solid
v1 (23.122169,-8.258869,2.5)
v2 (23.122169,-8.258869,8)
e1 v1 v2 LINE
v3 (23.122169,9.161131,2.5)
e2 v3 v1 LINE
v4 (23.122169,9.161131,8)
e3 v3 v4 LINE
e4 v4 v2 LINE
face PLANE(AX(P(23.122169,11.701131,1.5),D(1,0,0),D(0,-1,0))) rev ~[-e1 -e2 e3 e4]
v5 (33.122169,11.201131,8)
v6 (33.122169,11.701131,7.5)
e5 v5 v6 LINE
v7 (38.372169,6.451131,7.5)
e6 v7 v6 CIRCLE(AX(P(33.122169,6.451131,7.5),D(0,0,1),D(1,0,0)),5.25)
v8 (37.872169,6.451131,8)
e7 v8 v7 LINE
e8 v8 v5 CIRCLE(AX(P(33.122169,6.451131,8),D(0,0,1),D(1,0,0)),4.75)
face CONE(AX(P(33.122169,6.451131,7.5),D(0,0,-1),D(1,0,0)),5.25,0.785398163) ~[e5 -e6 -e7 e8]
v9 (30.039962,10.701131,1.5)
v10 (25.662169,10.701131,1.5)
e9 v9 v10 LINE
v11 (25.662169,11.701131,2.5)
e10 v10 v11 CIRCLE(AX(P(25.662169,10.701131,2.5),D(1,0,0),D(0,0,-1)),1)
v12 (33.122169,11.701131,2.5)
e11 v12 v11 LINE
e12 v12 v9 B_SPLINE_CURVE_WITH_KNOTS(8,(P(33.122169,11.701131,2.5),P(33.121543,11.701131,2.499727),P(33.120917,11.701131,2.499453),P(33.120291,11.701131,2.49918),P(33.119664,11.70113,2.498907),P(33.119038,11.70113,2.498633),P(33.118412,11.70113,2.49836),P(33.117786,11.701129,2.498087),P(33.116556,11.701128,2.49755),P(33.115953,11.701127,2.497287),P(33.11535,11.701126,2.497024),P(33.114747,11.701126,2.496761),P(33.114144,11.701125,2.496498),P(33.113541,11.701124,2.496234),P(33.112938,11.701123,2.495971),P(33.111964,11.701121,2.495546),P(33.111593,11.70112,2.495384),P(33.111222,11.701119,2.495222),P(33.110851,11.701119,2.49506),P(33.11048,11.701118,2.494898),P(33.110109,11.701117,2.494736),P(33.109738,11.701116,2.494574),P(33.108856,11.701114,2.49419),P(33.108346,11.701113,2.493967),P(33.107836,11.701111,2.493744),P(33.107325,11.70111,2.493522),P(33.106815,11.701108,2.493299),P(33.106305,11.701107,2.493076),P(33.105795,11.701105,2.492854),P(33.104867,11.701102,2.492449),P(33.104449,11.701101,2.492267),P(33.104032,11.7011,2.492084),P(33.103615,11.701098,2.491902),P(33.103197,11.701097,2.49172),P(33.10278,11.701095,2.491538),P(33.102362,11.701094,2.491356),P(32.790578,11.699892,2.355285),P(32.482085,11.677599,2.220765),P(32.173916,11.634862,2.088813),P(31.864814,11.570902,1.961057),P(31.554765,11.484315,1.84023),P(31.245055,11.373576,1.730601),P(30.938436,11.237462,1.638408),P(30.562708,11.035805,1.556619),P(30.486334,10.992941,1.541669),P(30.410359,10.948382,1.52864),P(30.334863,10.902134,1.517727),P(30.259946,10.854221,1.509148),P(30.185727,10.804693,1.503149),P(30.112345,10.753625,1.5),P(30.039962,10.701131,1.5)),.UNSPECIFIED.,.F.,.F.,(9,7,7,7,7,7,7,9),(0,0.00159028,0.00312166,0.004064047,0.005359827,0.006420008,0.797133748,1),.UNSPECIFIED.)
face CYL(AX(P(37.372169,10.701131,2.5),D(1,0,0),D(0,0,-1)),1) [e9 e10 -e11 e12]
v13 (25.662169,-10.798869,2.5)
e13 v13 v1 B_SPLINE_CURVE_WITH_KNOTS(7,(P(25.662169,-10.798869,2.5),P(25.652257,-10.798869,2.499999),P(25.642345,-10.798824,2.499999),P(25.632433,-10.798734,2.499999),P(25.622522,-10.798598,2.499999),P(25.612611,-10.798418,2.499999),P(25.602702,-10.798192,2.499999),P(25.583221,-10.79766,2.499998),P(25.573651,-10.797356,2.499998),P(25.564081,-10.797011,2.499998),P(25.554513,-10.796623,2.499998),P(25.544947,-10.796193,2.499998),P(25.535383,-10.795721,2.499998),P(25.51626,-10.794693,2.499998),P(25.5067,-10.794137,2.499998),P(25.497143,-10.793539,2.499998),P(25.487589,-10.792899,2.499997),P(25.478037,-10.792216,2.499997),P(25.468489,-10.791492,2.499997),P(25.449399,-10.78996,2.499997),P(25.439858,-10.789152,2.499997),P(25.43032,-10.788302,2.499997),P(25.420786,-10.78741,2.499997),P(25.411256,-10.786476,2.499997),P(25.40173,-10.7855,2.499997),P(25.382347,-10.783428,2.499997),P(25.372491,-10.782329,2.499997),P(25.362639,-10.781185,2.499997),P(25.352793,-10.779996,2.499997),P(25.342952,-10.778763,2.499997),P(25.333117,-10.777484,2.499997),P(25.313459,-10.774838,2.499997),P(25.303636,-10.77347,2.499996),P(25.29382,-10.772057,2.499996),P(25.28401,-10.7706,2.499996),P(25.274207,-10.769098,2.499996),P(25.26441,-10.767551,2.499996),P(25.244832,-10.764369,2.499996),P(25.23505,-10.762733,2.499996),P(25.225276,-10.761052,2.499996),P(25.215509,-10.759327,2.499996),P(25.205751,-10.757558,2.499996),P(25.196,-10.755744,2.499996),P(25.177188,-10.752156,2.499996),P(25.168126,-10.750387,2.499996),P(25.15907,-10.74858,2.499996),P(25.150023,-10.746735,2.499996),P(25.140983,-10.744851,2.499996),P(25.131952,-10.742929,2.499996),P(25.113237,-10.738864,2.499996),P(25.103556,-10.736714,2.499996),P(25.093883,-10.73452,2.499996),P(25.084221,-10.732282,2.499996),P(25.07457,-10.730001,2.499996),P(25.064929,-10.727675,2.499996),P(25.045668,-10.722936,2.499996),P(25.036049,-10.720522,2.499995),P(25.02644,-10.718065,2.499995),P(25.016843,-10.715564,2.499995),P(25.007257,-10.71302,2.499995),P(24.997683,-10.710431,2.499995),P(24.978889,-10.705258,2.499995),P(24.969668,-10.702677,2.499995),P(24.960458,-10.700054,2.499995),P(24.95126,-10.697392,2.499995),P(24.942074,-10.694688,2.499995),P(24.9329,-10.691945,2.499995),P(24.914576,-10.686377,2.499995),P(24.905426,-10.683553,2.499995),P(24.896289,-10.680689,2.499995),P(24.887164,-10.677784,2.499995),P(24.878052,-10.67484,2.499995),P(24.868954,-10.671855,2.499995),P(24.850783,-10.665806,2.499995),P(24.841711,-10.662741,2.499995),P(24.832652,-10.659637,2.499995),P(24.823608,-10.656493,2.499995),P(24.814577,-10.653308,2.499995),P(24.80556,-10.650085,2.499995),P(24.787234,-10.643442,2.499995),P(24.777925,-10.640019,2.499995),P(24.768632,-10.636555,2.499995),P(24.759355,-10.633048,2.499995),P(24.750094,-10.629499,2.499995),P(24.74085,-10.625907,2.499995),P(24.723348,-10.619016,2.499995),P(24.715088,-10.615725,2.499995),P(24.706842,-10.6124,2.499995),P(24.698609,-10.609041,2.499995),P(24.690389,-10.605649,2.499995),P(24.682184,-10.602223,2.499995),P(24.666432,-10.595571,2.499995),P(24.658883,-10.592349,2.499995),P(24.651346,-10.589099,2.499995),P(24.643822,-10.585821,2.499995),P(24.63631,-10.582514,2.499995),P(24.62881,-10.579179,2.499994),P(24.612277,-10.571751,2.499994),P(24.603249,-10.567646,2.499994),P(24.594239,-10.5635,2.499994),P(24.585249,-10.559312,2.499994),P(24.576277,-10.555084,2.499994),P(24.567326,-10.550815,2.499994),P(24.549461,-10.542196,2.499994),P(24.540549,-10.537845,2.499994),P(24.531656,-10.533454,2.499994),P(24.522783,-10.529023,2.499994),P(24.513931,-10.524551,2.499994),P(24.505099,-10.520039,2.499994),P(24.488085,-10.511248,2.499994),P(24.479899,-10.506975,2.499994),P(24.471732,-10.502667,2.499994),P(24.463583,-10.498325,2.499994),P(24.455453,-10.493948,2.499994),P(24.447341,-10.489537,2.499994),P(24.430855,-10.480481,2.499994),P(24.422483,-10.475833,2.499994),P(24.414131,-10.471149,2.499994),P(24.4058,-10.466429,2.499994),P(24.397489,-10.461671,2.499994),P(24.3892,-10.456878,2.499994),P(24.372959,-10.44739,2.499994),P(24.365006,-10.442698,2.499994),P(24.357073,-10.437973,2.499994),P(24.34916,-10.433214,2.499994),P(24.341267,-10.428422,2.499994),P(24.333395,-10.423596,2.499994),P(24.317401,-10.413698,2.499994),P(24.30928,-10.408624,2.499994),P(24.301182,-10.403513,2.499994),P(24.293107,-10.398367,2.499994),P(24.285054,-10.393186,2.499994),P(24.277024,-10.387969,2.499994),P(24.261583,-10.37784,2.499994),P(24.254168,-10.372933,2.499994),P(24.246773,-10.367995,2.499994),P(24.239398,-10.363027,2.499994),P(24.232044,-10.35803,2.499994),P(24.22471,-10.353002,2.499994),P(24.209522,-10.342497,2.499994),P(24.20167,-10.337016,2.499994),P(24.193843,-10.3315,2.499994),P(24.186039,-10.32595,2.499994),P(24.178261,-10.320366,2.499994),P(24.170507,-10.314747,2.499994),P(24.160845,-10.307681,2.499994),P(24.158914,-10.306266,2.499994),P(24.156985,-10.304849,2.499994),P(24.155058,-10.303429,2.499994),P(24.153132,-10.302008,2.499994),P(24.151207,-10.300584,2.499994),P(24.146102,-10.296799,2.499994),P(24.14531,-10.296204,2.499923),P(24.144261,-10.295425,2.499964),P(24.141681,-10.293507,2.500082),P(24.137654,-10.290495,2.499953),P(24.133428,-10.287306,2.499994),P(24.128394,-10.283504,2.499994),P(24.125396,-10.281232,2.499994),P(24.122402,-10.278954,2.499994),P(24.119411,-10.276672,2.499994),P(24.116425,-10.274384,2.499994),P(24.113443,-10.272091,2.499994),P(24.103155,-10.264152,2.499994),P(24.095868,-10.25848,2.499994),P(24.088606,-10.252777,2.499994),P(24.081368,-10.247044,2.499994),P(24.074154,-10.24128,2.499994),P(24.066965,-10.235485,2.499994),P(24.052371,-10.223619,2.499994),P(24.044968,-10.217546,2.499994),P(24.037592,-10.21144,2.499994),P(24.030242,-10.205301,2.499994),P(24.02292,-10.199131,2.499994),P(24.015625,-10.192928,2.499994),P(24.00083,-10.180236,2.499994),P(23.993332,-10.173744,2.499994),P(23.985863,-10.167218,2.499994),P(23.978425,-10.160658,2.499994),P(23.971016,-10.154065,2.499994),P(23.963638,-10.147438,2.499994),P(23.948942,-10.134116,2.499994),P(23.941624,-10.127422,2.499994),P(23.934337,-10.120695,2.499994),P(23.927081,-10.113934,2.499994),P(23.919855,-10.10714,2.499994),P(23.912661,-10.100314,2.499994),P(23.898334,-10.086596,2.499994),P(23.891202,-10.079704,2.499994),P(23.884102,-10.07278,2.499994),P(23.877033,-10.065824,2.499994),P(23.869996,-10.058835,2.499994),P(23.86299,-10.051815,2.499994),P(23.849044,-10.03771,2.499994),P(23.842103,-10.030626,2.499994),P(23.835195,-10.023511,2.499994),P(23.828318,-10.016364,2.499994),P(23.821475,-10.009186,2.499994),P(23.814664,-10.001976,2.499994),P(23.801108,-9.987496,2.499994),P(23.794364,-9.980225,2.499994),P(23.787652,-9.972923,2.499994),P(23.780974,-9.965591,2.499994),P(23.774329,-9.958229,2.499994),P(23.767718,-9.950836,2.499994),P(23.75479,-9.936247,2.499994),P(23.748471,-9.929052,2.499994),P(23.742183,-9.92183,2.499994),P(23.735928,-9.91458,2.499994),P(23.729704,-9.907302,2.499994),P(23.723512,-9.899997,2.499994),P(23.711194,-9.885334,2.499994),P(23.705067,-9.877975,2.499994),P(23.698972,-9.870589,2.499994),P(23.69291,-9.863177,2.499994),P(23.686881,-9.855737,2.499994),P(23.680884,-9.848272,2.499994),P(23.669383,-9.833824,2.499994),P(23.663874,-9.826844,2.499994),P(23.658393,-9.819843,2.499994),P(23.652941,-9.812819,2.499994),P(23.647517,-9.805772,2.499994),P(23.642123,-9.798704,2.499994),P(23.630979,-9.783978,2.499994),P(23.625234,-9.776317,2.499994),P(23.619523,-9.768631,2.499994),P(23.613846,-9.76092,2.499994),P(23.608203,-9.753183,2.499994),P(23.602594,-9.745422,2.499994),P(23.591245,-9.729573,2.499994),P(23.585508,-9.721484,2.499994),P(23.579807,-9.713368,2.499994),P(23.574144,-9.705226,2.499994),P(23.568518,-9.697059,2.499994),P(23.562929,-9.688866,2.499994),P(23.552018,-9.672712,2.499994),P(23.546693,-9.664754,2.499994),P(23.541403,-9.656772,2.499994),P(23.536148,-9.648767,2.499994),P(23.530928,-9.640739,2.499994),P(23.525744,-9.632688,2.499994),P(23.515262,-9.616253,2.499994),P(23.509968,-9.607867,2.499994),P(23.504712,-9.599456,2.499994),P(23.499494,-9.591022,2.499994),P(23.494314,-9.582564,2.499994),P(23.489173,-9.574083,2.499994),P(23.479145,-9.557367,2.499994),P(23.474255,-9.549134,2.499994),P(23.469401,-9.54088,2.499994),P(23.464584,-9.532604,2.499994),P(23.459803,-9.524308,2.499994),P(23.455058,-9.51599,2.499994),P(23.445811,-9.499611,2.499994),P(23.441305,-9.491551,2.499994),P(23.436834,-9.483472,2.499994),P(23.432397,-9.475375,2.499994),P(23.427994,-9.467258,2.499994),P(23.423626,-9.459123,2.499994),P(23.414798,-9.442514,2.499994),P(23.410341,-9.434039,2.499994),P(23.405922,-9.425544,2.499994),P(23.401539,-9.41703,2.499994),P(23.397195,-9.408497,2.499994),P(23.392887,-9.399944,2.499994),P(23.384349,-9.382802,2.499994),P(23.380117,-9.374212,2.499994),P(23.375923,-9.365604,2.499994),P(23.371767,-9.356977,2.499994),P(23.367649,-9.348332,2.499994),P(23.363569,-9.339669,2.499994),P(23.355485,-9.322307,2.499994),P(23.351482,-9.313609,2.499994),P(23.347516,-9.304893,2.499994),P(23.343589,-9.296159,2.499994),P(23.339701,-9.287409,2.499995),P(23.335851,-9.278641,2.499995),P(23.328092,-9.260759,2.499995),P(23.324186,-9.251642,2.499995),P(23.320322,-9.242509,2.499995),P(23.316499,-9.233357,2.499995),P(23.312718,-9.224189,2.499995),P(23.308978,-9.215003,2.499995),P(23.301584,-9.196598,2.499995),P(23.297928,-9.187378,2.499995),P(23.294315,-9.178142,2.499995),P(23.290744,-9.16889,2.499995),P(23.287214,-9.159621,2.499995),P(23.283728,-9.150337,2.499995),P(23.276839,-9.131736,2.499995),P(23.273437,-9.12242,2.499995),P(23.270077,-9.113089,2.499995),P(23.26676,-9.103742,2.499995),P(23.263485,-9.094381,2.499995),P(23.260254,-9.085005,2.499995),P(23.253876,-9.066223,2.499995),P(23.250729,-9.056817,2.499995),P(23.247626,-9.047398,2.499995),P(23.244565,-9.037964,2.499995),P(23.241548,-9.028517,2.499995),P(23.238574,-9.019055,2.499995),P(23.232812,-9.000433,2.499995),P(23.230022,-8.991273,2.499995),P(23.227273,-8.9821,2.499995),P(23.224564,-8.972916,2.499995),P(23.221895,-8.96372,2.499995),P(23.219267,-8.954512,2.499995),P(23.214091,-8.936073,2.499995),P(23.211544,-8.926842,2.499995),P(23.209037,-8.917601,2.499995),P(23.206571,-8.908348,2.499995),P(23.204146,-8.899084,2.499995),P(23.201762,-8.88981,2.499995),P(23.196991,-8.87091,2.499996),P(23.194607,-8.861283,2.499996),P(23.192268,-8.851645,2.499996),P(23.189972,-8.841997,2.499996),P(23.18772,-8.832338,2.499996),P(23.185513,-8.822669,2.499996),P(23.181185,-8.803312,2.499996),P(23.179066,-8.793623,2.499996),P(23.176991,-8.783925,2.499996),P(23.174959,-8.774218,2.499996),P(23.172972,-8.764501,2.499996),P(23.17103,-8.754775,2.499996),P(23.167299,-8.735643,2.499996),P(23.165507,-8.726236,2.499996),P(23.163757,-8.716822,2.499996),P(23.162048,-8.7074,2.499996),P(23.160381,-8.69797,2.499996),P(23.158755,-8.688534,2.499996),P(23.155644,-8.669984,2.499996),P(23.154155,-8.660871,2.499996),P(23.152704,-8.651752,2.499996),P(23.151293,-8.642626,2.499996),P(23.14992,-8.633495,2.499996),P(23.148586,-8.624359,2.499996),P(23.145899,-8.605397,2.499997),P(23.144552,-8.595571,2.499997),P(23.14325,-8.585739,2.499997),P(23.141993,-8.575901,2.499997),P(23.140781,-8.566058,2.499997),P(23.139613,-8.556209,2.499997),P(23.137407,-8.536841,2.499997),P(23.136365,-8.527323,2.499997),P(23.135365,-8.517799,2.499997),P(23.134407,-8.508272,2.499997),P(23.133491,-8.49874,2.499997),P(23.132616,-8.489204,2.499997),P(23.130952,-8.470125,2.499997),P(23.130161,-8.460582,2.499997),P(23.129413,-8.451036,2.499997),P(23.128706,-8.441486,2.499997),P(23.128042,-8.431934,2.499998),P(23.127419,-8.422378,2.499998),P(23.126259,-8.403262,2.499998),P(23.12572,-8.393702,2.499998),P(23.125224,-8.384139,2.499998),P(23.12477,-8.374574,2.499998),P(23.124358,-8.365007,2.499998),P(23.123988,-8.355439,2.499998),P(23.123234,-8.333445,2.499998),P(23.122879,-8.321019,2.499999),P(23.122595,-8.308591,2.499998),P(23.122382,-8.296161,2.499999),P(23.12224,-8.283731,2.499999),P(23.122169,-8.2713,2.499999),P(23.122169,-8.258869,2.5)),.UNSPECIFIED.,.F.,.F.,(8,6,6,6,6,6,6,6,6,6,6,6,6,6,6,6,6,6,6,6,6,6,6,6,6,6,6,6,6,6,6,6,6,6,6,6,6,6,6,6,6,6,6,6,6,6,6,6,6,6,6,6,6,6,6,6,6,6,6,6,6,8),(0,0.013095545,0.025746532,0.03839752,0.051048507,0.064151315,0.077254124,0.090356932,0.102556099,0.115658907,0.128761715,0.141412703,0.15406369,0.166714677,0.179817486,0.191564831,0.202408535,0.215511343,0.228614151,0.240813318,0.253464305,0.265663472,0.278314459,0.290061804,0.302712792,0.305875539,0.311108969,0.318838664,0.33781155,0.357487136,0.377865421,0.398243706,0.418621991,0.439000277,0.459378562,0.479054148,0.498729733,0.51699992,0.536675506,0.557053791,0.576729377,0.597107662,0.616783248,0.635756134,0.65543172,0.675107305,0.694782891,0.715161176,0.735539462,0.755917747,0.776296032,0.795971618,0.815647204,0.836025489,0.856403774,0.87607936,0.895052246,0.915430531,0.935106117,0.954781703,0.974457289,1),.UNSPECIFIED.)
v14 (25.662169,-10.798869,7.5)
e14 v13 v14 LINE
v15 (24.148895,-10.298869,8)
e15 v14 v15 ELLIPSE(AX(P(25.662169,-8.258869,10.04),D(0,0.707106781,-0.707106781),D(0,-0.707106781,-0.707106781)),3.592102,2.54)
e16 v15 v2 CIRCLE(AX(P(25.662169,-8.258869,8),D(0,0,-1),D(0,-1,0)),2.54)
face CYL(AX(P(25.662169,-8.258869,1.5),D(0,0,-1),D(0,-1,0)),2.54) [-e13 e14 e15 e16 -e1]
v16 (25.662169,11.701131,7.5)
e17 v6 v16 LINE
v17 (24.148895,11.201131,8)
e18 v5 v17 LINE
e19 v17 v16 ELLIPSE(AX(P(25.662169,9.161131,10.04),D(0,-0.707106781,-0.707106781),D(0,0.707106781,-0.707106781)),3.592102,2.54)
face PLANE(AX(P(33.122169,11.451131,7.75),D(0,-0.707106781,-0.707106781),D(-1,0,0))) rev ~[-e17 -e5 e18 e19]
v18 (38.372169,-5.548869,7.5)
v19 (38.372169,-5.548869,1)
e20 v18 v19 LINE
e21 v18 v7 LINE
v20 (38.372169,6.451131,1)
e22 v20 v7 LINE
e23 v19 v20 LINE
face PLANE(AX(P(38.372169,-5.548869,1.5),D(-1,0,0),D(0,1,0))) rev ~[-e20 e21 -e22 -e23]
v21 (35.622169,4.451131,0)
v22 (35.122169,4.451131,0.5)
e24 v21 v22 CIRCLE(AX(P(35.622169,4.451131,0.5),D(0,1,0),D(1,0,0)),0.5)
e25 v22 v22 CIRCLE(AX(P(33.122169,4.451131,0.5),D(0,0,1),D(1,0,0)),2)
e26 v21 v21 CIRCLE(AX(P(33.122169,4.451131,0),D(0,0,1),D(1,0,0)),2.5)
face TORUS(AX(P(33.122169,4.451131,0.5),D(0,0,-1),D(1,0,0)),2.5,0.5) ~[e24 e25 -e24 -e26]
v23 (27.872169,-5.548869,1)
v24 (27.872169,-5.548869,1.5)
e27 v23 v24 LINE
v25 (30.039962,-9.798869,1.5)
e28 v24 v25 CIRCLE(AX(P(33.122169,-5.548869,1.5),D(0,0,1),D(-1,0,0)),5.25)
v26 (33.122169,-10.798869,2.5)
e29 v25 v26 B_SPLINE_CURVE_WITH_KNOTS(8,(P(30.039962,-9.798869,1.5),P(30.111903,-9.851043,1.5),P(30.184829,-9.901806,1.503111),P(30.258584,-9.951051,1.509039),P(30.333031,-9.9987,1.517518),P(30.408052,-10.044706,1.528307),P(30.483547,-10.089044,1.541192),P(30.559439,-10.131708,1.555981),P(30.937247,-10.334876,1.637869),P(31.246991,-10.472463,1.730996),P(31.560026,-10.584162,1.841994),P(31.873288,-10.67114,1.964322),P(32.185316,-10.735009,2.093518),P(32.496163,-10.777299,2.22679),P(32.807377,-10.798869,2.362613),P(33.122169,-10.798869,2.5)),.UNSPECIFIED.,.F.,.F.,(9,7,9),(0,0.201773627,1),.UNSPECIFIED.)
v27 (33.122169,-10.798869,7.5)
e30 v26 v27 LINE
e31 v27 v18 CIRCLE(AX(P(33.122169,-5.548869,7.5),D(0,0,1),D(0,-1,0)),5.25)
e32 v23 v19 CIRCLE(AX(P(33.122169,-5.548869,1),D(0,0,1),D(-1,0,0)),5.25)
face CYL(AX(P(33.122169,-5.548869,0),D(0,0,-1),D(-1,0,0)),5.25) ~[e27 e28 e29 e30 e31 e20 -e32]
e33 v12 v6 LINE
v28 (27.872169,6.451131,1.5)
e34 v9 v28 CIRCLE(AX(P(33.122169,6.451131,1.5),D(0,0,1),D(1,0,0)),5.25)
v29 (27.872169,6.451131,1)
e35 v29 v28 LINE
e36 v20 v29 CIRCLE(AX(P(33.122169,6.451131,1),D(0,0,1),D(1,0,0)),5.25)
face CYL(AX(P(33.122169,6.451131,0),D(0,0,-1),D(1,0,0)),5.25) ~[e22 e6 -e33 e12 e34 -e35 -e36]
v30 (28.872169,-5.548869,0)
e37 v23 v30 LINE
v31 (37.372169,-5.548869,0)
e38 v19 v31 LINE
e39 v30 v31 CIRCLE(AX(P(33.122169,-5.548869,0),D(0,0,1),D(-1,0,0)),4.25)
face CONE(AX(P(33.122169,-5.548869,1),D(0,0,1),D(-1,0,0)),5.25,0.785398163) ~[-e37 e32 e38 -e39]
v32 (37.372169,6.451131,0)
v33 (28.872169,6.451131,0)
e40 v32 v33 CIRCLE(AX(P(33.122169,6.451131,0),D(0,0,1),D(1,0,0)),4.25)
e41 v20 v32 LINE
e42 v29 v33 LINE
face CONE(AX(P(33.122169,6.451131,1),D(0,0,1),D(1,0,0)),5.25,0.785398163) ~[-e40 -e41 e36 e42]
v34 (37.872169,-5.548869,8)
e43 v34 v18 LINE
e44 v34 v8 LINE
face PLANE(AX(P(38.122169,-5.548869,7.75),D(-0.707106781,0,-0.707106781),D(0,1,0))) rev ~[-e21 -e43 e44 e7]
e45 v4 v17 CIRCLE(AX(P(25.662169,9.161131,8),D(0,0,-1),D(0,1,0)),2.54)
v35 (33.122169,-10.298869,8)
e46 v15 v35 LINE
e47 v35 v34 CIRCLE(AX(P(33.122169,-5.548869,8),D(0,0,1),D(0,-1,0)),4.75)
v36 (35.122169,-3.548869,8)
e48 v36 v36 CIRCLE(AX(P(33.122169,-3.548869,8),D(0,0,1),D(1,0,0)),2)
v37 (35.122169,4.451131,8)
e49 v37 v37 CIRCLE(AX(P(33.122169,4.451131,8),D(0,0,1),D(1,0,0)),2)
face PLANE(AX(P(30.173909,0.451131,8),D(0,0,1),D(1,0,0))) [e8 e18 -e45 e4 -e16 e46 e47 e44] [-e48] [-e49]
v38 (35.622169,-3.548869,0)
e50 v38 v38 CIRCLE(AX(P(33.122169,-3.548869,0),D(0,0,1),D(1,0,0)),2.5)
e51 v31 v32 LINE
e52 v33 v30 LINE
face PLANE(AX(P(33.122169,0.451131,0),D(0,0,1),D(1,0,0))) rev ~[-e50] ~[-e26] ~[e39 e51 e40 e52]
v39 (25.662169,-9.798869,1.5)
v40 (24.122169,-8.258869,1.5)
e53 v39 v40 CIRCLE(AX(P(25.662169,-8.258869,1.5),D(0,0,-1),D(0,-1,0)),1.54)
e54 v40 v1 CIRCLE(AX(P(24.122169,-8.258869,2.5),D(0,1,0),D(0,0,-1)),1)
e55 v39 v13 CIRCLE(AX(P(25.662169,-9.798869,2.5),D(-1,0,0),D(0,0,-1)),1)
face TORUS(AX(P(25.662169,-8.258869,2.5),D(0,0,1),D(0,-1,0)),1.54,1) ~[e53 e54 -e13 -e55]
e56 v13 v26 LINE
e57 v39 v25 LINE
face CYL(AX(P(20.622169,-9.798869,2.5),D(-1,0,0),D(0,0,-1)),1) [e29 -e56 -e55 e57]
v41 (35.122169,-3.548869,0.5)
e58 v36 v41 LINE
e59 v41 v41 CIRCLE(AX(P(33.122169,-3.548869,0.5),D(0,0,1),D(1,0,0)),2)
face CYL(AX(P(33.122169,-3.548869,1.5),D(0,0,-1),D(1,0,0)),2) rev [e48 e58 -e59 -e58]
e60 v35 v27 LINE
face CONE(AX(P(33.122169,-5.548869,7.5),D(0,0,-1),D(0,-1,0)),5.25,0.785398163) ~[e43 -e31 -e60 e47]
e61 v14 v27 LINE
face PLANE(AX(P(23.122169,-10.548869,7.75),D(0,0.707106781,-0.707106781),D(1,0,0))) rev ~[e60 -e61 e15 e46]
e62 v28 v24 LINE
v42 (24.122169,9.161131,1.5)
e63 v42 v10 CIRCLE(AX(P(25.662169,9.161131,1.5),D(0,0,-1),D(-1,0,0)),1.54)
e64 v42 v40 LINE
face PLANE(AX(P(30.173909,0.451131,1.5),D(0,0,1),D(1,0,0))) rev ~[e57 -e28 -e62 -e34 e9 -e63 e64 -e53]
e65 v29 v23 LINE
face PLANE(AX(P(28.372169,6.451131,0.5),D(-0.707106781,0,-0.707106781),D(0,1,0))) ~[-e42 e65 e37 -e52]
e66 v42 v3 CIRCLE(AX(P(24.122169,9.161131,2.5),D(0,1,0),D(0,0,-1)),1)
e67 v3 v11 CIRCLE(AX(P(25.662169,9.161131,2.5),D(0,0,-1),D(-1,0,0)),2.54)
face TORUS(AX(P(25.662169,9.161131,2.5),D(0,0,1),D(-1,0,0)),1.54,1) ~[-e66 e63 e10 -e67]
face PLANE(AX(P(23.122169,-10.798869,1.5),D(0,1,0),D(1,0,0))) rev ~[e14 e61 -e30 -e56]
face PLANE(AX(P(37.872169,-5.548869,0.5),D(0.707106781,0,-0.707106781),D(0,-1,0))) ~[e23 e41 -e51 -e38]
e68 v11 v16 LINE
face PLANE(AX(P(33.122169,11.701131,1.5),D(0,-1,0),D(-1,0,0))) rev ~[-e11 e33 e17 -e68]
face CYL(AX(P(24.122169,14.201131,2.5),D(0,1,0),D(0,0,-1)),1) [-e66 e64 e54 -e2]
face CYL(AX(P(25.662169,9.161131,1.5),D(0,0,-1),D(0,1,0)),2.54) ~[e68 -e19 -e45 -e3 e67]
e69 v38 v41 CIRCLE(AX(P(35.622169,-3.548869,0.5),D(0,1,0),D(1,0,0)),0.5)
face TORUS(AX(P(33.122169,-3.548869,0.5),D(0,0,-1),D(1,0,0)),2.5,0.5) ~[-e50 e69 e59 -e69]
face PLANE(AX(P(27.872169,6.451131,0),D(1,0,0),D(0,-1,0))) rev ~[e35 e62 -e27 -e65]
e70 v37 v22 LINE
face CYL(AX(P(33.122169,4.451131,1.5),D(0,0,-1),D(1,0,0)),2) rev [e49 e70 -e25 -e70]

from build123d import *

# Parameters (mm, degrees)
F0_R         = 2
F1_DEPTH     = 1.5
F2_R         = 2
F3_DEPTH     = 6.5
F4_SIZE      = 1
F5_T1_DEPTH  = 27.5
F5_T6_DEPTH  = 16.75
F5_S7_R      = 5.25
F5_T8_DEPTH  = 10
F5_T12_DEPTH = 16.75
F5_S13_R     = 5.25
F5_T14_DEPTH = 10
F6_SIZE      = 0.5
F7_R         = 0.5
F8_T1_DEPTH  = 12.35
F8_T4_ANGLE  = 90
F8_T6_ANGLE  = 90


# Not quite as in the source:
# - a fillet or chamfer that OpenCascade refuses, or shapes differently, is made with other operations: its cross-section is extruded or revolved along the edge and cut away or added


with BuildPart() as f1:
    # F0 (on Top) → F1 (new body)
    with BuildSketch(Plane.XY):
        with BuildLine():
            ThreePointArc((38.3721691668, 6.4511308521), (33.1221691668, 11.7011308521), (27.8721691668, 6.4511308521))
            Line((27.8721691668, 6.4511308521), (27.8721691668, -5.5488691479))
            ThreePointArc((27.8721691668, -5.5488691479), (33.1221691668, -10.7988691479), (38.3721691668, -5.5488691479))
            Line((38.3721691668, -5.5488691479), (38.3721691668, 6.4511308521))
        make_face()
        with Locations((33.1221691668, -3.5488691479)):
            Circle(F0_R, mode=Mode.SUBTRACT)
        with Locations((33.1221691668, 4.4511308521)):
            Circle(F0_R, mode=Mode.SUBTRACT)
    extrude(amount=F1_DEPTH)

    # F2 (on face) → F3 (join)
    with BuildSketch(Plane.XY.offset(1.5)):
        with BuildLine():
            Line((38.3721691668, -5.5488691479), (38.3721691668, 6.4511308521))
            ThreePointArc((38.3721691668, 6.4511308521), (36.834479768, 10.1634414533), (33.1221691668, 11.7011308521))
            Line((33.1221691668, 11.7011308521), (23.1221691668, 11.7011308521))
            Line((23.1221691668, 11.7011308521), (23.1221691668, -10.7988691479))
            Line((23.1221691668, -10.7988691479), (33.1221691668, -10.7988691479))
            ThreePointArc((33.1221691668, -10.7988691479), (36.834479768, -9.2611797491), (38.3721691668, -5.5488691479))
        make_face()
        with Locations((33.1221691668, -3.5488691479)):
            Circle(F2_R, mode=Mode.SUBTRACT)
        with Locations((33.1221691668, 4.4511308521)):
            Circle(F2_R, mode=Mode.SUBTRACT)
    extrude(amount=F3_DEPTH)

    # F4
    f4_edges = [f1.edges().sort_by_distance(p)[0] for p in [
        (27.872169, 0.451131, 0),
        (38.372169, 0.451131, 0),
        (33.122169, 11.701131, 0),
        (33.122169, -10.798869, 0),
    ]]
    chamfer(f4_edges, length=F4_SIZE)

    # F5: fillet of radius 1 on 3 edges, made by hand

    # F5_s2 → F5_t1 (cut)
    with BuildSketch(Plane.XZ.offset(-14.2011308521)):
        with BuildLine():
            ThreePointArc((24.1221691668, 1.5), (23.4150623856, 1.7928932188), (23.1221691668, 2.5))
            Line((23.1221691668, 2.5), (23.1221691668, 1.5))
            Line((23.1221691668, 1.5), (24.1221691668, 1.5))
        make_face()
    extrude(amount=F5_T1_DEPTH, mode=Mode.SUBTRACT)


with BuildPart() as f5_tool4:
    # F5_s5 → F5_t6 (new body)
    with BuildSketch(Plane.YZ.offset(37.3721691668)):
        with BuildLine():
            ThreePointArc((10.7011308521, 1.5), (11.4082376333, 1.7928932188), (11.7011308521, 2.5))
            Line((11.7011308521, 2.5), (11.7011308521, 1.5))
            Line((11.7011308521, 1.5), (10.7011308521, 1.5))
        make_face()
    extrude(amount=-F5_T6_DEPTH)

    # F5_s7 → F5_t8 (cut, symmetric)
    with BuildSketch(Plane.XY.offset(2)):
        with Locations((33.1221691668, 6.4511308521)):
            Circle(F5_S7_R)
    extrude(amount=F5_T8_DEPTH, both=True, mode=Mode.SUBTRACT)


with BuildPart() as f1_1:
    add(f1.part)

    # F5_t3: cut F5_tool4
    add(f5_tool4.part, mode=Mode.SUBTRACT)


with BuildPart() as f5_tool10:
    # F5_s11 → F5_t12 (new body)
    with BuildSketch(Plane.YZ.offset(20.6221691668)):
        with BuildLine():
            ThreePointArc((-9.7988691479, 1.5), (-10.5059759291, 1.7928932188), (-10.7988691479, 2.5))
            Line((-10.7988691479, 2.5), (-10.7988691479, 1.5))
            Line((-10.7988691479, 1.5), (-9.7988691479, 1.5))
        make_face()
    extrude(amount=F5_T12_DEPTH)

    # F5_s13 → F5_t14 (cut, symmetric)
    with BuildSketch(Plane.XY.offset(2)):
        with Locations((33.1221691668, -5.5488691479)):
            Circle(F5_S13_R)
    extrude(amount=F5_T14_DEPTH, both=True, mode=Mode.SUBTRACT)


with BuildPart() as f1_2:
    add(f1_1.part)

    # F5_t9: cut F5_tool10
    add(f5_tool10.part, mode=Mode.SUBTRACT)

    # F6
    f6_edges = [f1_2.edges().sort_by_distance(p)[0] for p in [
        (28.122169, 11.701131, 8),
        (38.372169, 0.451131, 8),
        (36.83448, -9.26118, 8),
        (36.83448, 10.163441, 8),
        (28.122169, -10.798869, 8),
    ]]
    chamfer(f6_edges, length=F6_SIZE)

    # F7
    f7_edges = [f1_2.edges().sort_by_distance(p)[0] for p in [
        (31.122169, -3.548869, 0),
        (31.122169, 4.451131, 0),
    ]]
    fillet(f7_edges, radius=F7_R)

    # F8: fillet of radius 2.54 on 2 edges, made by hand

    # F8_s2 → F8_t1 (cut)
    with BuildSketch(Plane.XY.offset(1.5)):
        with BuildLine():
            ThreePointArc((25.6621691668, 11.7011308521), (23.8661179426, 10.9571820763), (23.1221691668, 9.1611308521))
            Line((23.1221691668, 9.1611308521), (23.1221691668, 11.7011308521))
            Line((23.1221691668, 11.7011308521), (25.6621691668, 11.7011308521))
        make_face()
        with BuildLine():
            ThreePointArc((25.6621691668, -10.7988691479), (23.8661179426, -10.0549203721), (23.1221691668, -8.2588691479))
            Line((23.1221691668, -8.2588691479), (23.1221691668, -10.7988691479))
            Line((23.1221691668, -10.7988691479), (25.6621691668, -10.7988691479))
        make_face()
    extrude(amount=F8_T1_DEPTH, mode=Mode.SUBTRACT)

    # F8_s3 → F8_t4 (revolve, cut)
    with BuildSketch(Plane.YZ.offset(25.6621691668)):
        with BuildLine():
            ThreePointArc((-9.7988691479, 1.5), (-10.5059759291, 1.7928932188), (-10.7988691479, 2.5))
            Line((-10.7988691479, 2.5), (-10.7988691479, 1.5))
            Line((-10.7988691479, 1.5), (-9.7988691479, 1.5))
        make_face()
    revolve(axis=Axis((25.6621691668, -8.2588691479, 1.5), (0, 0, -1)), revolution_arc=F8_T4_ANGLE, mode=Mode.SUBTRACT)

    # F8_s5 → F8_t6 (revolve, cut)
    with BuildSketch(Plane.XZ.offset(-9.1611308521)):
        with BuildLine():
            ThreePointArc((24.1221691668, 1.5), (23.4150623856, 1.7928932188), (23.1221691668, 2.5))
            Line((23.1221691668, 2.5), (23.1221691668, 1.5))
            Line((23.1221691668, 1.5), (24.1221691668, 1.5))
        make_face()
    revolve(axis=Axis((25.6621691668, 9.1611308521, 1.5), (0, 0, -1)), revolution_arc=F8_T6_ANGLE, mode=Mode.SUBTRACT)


solid = f1_2.part
